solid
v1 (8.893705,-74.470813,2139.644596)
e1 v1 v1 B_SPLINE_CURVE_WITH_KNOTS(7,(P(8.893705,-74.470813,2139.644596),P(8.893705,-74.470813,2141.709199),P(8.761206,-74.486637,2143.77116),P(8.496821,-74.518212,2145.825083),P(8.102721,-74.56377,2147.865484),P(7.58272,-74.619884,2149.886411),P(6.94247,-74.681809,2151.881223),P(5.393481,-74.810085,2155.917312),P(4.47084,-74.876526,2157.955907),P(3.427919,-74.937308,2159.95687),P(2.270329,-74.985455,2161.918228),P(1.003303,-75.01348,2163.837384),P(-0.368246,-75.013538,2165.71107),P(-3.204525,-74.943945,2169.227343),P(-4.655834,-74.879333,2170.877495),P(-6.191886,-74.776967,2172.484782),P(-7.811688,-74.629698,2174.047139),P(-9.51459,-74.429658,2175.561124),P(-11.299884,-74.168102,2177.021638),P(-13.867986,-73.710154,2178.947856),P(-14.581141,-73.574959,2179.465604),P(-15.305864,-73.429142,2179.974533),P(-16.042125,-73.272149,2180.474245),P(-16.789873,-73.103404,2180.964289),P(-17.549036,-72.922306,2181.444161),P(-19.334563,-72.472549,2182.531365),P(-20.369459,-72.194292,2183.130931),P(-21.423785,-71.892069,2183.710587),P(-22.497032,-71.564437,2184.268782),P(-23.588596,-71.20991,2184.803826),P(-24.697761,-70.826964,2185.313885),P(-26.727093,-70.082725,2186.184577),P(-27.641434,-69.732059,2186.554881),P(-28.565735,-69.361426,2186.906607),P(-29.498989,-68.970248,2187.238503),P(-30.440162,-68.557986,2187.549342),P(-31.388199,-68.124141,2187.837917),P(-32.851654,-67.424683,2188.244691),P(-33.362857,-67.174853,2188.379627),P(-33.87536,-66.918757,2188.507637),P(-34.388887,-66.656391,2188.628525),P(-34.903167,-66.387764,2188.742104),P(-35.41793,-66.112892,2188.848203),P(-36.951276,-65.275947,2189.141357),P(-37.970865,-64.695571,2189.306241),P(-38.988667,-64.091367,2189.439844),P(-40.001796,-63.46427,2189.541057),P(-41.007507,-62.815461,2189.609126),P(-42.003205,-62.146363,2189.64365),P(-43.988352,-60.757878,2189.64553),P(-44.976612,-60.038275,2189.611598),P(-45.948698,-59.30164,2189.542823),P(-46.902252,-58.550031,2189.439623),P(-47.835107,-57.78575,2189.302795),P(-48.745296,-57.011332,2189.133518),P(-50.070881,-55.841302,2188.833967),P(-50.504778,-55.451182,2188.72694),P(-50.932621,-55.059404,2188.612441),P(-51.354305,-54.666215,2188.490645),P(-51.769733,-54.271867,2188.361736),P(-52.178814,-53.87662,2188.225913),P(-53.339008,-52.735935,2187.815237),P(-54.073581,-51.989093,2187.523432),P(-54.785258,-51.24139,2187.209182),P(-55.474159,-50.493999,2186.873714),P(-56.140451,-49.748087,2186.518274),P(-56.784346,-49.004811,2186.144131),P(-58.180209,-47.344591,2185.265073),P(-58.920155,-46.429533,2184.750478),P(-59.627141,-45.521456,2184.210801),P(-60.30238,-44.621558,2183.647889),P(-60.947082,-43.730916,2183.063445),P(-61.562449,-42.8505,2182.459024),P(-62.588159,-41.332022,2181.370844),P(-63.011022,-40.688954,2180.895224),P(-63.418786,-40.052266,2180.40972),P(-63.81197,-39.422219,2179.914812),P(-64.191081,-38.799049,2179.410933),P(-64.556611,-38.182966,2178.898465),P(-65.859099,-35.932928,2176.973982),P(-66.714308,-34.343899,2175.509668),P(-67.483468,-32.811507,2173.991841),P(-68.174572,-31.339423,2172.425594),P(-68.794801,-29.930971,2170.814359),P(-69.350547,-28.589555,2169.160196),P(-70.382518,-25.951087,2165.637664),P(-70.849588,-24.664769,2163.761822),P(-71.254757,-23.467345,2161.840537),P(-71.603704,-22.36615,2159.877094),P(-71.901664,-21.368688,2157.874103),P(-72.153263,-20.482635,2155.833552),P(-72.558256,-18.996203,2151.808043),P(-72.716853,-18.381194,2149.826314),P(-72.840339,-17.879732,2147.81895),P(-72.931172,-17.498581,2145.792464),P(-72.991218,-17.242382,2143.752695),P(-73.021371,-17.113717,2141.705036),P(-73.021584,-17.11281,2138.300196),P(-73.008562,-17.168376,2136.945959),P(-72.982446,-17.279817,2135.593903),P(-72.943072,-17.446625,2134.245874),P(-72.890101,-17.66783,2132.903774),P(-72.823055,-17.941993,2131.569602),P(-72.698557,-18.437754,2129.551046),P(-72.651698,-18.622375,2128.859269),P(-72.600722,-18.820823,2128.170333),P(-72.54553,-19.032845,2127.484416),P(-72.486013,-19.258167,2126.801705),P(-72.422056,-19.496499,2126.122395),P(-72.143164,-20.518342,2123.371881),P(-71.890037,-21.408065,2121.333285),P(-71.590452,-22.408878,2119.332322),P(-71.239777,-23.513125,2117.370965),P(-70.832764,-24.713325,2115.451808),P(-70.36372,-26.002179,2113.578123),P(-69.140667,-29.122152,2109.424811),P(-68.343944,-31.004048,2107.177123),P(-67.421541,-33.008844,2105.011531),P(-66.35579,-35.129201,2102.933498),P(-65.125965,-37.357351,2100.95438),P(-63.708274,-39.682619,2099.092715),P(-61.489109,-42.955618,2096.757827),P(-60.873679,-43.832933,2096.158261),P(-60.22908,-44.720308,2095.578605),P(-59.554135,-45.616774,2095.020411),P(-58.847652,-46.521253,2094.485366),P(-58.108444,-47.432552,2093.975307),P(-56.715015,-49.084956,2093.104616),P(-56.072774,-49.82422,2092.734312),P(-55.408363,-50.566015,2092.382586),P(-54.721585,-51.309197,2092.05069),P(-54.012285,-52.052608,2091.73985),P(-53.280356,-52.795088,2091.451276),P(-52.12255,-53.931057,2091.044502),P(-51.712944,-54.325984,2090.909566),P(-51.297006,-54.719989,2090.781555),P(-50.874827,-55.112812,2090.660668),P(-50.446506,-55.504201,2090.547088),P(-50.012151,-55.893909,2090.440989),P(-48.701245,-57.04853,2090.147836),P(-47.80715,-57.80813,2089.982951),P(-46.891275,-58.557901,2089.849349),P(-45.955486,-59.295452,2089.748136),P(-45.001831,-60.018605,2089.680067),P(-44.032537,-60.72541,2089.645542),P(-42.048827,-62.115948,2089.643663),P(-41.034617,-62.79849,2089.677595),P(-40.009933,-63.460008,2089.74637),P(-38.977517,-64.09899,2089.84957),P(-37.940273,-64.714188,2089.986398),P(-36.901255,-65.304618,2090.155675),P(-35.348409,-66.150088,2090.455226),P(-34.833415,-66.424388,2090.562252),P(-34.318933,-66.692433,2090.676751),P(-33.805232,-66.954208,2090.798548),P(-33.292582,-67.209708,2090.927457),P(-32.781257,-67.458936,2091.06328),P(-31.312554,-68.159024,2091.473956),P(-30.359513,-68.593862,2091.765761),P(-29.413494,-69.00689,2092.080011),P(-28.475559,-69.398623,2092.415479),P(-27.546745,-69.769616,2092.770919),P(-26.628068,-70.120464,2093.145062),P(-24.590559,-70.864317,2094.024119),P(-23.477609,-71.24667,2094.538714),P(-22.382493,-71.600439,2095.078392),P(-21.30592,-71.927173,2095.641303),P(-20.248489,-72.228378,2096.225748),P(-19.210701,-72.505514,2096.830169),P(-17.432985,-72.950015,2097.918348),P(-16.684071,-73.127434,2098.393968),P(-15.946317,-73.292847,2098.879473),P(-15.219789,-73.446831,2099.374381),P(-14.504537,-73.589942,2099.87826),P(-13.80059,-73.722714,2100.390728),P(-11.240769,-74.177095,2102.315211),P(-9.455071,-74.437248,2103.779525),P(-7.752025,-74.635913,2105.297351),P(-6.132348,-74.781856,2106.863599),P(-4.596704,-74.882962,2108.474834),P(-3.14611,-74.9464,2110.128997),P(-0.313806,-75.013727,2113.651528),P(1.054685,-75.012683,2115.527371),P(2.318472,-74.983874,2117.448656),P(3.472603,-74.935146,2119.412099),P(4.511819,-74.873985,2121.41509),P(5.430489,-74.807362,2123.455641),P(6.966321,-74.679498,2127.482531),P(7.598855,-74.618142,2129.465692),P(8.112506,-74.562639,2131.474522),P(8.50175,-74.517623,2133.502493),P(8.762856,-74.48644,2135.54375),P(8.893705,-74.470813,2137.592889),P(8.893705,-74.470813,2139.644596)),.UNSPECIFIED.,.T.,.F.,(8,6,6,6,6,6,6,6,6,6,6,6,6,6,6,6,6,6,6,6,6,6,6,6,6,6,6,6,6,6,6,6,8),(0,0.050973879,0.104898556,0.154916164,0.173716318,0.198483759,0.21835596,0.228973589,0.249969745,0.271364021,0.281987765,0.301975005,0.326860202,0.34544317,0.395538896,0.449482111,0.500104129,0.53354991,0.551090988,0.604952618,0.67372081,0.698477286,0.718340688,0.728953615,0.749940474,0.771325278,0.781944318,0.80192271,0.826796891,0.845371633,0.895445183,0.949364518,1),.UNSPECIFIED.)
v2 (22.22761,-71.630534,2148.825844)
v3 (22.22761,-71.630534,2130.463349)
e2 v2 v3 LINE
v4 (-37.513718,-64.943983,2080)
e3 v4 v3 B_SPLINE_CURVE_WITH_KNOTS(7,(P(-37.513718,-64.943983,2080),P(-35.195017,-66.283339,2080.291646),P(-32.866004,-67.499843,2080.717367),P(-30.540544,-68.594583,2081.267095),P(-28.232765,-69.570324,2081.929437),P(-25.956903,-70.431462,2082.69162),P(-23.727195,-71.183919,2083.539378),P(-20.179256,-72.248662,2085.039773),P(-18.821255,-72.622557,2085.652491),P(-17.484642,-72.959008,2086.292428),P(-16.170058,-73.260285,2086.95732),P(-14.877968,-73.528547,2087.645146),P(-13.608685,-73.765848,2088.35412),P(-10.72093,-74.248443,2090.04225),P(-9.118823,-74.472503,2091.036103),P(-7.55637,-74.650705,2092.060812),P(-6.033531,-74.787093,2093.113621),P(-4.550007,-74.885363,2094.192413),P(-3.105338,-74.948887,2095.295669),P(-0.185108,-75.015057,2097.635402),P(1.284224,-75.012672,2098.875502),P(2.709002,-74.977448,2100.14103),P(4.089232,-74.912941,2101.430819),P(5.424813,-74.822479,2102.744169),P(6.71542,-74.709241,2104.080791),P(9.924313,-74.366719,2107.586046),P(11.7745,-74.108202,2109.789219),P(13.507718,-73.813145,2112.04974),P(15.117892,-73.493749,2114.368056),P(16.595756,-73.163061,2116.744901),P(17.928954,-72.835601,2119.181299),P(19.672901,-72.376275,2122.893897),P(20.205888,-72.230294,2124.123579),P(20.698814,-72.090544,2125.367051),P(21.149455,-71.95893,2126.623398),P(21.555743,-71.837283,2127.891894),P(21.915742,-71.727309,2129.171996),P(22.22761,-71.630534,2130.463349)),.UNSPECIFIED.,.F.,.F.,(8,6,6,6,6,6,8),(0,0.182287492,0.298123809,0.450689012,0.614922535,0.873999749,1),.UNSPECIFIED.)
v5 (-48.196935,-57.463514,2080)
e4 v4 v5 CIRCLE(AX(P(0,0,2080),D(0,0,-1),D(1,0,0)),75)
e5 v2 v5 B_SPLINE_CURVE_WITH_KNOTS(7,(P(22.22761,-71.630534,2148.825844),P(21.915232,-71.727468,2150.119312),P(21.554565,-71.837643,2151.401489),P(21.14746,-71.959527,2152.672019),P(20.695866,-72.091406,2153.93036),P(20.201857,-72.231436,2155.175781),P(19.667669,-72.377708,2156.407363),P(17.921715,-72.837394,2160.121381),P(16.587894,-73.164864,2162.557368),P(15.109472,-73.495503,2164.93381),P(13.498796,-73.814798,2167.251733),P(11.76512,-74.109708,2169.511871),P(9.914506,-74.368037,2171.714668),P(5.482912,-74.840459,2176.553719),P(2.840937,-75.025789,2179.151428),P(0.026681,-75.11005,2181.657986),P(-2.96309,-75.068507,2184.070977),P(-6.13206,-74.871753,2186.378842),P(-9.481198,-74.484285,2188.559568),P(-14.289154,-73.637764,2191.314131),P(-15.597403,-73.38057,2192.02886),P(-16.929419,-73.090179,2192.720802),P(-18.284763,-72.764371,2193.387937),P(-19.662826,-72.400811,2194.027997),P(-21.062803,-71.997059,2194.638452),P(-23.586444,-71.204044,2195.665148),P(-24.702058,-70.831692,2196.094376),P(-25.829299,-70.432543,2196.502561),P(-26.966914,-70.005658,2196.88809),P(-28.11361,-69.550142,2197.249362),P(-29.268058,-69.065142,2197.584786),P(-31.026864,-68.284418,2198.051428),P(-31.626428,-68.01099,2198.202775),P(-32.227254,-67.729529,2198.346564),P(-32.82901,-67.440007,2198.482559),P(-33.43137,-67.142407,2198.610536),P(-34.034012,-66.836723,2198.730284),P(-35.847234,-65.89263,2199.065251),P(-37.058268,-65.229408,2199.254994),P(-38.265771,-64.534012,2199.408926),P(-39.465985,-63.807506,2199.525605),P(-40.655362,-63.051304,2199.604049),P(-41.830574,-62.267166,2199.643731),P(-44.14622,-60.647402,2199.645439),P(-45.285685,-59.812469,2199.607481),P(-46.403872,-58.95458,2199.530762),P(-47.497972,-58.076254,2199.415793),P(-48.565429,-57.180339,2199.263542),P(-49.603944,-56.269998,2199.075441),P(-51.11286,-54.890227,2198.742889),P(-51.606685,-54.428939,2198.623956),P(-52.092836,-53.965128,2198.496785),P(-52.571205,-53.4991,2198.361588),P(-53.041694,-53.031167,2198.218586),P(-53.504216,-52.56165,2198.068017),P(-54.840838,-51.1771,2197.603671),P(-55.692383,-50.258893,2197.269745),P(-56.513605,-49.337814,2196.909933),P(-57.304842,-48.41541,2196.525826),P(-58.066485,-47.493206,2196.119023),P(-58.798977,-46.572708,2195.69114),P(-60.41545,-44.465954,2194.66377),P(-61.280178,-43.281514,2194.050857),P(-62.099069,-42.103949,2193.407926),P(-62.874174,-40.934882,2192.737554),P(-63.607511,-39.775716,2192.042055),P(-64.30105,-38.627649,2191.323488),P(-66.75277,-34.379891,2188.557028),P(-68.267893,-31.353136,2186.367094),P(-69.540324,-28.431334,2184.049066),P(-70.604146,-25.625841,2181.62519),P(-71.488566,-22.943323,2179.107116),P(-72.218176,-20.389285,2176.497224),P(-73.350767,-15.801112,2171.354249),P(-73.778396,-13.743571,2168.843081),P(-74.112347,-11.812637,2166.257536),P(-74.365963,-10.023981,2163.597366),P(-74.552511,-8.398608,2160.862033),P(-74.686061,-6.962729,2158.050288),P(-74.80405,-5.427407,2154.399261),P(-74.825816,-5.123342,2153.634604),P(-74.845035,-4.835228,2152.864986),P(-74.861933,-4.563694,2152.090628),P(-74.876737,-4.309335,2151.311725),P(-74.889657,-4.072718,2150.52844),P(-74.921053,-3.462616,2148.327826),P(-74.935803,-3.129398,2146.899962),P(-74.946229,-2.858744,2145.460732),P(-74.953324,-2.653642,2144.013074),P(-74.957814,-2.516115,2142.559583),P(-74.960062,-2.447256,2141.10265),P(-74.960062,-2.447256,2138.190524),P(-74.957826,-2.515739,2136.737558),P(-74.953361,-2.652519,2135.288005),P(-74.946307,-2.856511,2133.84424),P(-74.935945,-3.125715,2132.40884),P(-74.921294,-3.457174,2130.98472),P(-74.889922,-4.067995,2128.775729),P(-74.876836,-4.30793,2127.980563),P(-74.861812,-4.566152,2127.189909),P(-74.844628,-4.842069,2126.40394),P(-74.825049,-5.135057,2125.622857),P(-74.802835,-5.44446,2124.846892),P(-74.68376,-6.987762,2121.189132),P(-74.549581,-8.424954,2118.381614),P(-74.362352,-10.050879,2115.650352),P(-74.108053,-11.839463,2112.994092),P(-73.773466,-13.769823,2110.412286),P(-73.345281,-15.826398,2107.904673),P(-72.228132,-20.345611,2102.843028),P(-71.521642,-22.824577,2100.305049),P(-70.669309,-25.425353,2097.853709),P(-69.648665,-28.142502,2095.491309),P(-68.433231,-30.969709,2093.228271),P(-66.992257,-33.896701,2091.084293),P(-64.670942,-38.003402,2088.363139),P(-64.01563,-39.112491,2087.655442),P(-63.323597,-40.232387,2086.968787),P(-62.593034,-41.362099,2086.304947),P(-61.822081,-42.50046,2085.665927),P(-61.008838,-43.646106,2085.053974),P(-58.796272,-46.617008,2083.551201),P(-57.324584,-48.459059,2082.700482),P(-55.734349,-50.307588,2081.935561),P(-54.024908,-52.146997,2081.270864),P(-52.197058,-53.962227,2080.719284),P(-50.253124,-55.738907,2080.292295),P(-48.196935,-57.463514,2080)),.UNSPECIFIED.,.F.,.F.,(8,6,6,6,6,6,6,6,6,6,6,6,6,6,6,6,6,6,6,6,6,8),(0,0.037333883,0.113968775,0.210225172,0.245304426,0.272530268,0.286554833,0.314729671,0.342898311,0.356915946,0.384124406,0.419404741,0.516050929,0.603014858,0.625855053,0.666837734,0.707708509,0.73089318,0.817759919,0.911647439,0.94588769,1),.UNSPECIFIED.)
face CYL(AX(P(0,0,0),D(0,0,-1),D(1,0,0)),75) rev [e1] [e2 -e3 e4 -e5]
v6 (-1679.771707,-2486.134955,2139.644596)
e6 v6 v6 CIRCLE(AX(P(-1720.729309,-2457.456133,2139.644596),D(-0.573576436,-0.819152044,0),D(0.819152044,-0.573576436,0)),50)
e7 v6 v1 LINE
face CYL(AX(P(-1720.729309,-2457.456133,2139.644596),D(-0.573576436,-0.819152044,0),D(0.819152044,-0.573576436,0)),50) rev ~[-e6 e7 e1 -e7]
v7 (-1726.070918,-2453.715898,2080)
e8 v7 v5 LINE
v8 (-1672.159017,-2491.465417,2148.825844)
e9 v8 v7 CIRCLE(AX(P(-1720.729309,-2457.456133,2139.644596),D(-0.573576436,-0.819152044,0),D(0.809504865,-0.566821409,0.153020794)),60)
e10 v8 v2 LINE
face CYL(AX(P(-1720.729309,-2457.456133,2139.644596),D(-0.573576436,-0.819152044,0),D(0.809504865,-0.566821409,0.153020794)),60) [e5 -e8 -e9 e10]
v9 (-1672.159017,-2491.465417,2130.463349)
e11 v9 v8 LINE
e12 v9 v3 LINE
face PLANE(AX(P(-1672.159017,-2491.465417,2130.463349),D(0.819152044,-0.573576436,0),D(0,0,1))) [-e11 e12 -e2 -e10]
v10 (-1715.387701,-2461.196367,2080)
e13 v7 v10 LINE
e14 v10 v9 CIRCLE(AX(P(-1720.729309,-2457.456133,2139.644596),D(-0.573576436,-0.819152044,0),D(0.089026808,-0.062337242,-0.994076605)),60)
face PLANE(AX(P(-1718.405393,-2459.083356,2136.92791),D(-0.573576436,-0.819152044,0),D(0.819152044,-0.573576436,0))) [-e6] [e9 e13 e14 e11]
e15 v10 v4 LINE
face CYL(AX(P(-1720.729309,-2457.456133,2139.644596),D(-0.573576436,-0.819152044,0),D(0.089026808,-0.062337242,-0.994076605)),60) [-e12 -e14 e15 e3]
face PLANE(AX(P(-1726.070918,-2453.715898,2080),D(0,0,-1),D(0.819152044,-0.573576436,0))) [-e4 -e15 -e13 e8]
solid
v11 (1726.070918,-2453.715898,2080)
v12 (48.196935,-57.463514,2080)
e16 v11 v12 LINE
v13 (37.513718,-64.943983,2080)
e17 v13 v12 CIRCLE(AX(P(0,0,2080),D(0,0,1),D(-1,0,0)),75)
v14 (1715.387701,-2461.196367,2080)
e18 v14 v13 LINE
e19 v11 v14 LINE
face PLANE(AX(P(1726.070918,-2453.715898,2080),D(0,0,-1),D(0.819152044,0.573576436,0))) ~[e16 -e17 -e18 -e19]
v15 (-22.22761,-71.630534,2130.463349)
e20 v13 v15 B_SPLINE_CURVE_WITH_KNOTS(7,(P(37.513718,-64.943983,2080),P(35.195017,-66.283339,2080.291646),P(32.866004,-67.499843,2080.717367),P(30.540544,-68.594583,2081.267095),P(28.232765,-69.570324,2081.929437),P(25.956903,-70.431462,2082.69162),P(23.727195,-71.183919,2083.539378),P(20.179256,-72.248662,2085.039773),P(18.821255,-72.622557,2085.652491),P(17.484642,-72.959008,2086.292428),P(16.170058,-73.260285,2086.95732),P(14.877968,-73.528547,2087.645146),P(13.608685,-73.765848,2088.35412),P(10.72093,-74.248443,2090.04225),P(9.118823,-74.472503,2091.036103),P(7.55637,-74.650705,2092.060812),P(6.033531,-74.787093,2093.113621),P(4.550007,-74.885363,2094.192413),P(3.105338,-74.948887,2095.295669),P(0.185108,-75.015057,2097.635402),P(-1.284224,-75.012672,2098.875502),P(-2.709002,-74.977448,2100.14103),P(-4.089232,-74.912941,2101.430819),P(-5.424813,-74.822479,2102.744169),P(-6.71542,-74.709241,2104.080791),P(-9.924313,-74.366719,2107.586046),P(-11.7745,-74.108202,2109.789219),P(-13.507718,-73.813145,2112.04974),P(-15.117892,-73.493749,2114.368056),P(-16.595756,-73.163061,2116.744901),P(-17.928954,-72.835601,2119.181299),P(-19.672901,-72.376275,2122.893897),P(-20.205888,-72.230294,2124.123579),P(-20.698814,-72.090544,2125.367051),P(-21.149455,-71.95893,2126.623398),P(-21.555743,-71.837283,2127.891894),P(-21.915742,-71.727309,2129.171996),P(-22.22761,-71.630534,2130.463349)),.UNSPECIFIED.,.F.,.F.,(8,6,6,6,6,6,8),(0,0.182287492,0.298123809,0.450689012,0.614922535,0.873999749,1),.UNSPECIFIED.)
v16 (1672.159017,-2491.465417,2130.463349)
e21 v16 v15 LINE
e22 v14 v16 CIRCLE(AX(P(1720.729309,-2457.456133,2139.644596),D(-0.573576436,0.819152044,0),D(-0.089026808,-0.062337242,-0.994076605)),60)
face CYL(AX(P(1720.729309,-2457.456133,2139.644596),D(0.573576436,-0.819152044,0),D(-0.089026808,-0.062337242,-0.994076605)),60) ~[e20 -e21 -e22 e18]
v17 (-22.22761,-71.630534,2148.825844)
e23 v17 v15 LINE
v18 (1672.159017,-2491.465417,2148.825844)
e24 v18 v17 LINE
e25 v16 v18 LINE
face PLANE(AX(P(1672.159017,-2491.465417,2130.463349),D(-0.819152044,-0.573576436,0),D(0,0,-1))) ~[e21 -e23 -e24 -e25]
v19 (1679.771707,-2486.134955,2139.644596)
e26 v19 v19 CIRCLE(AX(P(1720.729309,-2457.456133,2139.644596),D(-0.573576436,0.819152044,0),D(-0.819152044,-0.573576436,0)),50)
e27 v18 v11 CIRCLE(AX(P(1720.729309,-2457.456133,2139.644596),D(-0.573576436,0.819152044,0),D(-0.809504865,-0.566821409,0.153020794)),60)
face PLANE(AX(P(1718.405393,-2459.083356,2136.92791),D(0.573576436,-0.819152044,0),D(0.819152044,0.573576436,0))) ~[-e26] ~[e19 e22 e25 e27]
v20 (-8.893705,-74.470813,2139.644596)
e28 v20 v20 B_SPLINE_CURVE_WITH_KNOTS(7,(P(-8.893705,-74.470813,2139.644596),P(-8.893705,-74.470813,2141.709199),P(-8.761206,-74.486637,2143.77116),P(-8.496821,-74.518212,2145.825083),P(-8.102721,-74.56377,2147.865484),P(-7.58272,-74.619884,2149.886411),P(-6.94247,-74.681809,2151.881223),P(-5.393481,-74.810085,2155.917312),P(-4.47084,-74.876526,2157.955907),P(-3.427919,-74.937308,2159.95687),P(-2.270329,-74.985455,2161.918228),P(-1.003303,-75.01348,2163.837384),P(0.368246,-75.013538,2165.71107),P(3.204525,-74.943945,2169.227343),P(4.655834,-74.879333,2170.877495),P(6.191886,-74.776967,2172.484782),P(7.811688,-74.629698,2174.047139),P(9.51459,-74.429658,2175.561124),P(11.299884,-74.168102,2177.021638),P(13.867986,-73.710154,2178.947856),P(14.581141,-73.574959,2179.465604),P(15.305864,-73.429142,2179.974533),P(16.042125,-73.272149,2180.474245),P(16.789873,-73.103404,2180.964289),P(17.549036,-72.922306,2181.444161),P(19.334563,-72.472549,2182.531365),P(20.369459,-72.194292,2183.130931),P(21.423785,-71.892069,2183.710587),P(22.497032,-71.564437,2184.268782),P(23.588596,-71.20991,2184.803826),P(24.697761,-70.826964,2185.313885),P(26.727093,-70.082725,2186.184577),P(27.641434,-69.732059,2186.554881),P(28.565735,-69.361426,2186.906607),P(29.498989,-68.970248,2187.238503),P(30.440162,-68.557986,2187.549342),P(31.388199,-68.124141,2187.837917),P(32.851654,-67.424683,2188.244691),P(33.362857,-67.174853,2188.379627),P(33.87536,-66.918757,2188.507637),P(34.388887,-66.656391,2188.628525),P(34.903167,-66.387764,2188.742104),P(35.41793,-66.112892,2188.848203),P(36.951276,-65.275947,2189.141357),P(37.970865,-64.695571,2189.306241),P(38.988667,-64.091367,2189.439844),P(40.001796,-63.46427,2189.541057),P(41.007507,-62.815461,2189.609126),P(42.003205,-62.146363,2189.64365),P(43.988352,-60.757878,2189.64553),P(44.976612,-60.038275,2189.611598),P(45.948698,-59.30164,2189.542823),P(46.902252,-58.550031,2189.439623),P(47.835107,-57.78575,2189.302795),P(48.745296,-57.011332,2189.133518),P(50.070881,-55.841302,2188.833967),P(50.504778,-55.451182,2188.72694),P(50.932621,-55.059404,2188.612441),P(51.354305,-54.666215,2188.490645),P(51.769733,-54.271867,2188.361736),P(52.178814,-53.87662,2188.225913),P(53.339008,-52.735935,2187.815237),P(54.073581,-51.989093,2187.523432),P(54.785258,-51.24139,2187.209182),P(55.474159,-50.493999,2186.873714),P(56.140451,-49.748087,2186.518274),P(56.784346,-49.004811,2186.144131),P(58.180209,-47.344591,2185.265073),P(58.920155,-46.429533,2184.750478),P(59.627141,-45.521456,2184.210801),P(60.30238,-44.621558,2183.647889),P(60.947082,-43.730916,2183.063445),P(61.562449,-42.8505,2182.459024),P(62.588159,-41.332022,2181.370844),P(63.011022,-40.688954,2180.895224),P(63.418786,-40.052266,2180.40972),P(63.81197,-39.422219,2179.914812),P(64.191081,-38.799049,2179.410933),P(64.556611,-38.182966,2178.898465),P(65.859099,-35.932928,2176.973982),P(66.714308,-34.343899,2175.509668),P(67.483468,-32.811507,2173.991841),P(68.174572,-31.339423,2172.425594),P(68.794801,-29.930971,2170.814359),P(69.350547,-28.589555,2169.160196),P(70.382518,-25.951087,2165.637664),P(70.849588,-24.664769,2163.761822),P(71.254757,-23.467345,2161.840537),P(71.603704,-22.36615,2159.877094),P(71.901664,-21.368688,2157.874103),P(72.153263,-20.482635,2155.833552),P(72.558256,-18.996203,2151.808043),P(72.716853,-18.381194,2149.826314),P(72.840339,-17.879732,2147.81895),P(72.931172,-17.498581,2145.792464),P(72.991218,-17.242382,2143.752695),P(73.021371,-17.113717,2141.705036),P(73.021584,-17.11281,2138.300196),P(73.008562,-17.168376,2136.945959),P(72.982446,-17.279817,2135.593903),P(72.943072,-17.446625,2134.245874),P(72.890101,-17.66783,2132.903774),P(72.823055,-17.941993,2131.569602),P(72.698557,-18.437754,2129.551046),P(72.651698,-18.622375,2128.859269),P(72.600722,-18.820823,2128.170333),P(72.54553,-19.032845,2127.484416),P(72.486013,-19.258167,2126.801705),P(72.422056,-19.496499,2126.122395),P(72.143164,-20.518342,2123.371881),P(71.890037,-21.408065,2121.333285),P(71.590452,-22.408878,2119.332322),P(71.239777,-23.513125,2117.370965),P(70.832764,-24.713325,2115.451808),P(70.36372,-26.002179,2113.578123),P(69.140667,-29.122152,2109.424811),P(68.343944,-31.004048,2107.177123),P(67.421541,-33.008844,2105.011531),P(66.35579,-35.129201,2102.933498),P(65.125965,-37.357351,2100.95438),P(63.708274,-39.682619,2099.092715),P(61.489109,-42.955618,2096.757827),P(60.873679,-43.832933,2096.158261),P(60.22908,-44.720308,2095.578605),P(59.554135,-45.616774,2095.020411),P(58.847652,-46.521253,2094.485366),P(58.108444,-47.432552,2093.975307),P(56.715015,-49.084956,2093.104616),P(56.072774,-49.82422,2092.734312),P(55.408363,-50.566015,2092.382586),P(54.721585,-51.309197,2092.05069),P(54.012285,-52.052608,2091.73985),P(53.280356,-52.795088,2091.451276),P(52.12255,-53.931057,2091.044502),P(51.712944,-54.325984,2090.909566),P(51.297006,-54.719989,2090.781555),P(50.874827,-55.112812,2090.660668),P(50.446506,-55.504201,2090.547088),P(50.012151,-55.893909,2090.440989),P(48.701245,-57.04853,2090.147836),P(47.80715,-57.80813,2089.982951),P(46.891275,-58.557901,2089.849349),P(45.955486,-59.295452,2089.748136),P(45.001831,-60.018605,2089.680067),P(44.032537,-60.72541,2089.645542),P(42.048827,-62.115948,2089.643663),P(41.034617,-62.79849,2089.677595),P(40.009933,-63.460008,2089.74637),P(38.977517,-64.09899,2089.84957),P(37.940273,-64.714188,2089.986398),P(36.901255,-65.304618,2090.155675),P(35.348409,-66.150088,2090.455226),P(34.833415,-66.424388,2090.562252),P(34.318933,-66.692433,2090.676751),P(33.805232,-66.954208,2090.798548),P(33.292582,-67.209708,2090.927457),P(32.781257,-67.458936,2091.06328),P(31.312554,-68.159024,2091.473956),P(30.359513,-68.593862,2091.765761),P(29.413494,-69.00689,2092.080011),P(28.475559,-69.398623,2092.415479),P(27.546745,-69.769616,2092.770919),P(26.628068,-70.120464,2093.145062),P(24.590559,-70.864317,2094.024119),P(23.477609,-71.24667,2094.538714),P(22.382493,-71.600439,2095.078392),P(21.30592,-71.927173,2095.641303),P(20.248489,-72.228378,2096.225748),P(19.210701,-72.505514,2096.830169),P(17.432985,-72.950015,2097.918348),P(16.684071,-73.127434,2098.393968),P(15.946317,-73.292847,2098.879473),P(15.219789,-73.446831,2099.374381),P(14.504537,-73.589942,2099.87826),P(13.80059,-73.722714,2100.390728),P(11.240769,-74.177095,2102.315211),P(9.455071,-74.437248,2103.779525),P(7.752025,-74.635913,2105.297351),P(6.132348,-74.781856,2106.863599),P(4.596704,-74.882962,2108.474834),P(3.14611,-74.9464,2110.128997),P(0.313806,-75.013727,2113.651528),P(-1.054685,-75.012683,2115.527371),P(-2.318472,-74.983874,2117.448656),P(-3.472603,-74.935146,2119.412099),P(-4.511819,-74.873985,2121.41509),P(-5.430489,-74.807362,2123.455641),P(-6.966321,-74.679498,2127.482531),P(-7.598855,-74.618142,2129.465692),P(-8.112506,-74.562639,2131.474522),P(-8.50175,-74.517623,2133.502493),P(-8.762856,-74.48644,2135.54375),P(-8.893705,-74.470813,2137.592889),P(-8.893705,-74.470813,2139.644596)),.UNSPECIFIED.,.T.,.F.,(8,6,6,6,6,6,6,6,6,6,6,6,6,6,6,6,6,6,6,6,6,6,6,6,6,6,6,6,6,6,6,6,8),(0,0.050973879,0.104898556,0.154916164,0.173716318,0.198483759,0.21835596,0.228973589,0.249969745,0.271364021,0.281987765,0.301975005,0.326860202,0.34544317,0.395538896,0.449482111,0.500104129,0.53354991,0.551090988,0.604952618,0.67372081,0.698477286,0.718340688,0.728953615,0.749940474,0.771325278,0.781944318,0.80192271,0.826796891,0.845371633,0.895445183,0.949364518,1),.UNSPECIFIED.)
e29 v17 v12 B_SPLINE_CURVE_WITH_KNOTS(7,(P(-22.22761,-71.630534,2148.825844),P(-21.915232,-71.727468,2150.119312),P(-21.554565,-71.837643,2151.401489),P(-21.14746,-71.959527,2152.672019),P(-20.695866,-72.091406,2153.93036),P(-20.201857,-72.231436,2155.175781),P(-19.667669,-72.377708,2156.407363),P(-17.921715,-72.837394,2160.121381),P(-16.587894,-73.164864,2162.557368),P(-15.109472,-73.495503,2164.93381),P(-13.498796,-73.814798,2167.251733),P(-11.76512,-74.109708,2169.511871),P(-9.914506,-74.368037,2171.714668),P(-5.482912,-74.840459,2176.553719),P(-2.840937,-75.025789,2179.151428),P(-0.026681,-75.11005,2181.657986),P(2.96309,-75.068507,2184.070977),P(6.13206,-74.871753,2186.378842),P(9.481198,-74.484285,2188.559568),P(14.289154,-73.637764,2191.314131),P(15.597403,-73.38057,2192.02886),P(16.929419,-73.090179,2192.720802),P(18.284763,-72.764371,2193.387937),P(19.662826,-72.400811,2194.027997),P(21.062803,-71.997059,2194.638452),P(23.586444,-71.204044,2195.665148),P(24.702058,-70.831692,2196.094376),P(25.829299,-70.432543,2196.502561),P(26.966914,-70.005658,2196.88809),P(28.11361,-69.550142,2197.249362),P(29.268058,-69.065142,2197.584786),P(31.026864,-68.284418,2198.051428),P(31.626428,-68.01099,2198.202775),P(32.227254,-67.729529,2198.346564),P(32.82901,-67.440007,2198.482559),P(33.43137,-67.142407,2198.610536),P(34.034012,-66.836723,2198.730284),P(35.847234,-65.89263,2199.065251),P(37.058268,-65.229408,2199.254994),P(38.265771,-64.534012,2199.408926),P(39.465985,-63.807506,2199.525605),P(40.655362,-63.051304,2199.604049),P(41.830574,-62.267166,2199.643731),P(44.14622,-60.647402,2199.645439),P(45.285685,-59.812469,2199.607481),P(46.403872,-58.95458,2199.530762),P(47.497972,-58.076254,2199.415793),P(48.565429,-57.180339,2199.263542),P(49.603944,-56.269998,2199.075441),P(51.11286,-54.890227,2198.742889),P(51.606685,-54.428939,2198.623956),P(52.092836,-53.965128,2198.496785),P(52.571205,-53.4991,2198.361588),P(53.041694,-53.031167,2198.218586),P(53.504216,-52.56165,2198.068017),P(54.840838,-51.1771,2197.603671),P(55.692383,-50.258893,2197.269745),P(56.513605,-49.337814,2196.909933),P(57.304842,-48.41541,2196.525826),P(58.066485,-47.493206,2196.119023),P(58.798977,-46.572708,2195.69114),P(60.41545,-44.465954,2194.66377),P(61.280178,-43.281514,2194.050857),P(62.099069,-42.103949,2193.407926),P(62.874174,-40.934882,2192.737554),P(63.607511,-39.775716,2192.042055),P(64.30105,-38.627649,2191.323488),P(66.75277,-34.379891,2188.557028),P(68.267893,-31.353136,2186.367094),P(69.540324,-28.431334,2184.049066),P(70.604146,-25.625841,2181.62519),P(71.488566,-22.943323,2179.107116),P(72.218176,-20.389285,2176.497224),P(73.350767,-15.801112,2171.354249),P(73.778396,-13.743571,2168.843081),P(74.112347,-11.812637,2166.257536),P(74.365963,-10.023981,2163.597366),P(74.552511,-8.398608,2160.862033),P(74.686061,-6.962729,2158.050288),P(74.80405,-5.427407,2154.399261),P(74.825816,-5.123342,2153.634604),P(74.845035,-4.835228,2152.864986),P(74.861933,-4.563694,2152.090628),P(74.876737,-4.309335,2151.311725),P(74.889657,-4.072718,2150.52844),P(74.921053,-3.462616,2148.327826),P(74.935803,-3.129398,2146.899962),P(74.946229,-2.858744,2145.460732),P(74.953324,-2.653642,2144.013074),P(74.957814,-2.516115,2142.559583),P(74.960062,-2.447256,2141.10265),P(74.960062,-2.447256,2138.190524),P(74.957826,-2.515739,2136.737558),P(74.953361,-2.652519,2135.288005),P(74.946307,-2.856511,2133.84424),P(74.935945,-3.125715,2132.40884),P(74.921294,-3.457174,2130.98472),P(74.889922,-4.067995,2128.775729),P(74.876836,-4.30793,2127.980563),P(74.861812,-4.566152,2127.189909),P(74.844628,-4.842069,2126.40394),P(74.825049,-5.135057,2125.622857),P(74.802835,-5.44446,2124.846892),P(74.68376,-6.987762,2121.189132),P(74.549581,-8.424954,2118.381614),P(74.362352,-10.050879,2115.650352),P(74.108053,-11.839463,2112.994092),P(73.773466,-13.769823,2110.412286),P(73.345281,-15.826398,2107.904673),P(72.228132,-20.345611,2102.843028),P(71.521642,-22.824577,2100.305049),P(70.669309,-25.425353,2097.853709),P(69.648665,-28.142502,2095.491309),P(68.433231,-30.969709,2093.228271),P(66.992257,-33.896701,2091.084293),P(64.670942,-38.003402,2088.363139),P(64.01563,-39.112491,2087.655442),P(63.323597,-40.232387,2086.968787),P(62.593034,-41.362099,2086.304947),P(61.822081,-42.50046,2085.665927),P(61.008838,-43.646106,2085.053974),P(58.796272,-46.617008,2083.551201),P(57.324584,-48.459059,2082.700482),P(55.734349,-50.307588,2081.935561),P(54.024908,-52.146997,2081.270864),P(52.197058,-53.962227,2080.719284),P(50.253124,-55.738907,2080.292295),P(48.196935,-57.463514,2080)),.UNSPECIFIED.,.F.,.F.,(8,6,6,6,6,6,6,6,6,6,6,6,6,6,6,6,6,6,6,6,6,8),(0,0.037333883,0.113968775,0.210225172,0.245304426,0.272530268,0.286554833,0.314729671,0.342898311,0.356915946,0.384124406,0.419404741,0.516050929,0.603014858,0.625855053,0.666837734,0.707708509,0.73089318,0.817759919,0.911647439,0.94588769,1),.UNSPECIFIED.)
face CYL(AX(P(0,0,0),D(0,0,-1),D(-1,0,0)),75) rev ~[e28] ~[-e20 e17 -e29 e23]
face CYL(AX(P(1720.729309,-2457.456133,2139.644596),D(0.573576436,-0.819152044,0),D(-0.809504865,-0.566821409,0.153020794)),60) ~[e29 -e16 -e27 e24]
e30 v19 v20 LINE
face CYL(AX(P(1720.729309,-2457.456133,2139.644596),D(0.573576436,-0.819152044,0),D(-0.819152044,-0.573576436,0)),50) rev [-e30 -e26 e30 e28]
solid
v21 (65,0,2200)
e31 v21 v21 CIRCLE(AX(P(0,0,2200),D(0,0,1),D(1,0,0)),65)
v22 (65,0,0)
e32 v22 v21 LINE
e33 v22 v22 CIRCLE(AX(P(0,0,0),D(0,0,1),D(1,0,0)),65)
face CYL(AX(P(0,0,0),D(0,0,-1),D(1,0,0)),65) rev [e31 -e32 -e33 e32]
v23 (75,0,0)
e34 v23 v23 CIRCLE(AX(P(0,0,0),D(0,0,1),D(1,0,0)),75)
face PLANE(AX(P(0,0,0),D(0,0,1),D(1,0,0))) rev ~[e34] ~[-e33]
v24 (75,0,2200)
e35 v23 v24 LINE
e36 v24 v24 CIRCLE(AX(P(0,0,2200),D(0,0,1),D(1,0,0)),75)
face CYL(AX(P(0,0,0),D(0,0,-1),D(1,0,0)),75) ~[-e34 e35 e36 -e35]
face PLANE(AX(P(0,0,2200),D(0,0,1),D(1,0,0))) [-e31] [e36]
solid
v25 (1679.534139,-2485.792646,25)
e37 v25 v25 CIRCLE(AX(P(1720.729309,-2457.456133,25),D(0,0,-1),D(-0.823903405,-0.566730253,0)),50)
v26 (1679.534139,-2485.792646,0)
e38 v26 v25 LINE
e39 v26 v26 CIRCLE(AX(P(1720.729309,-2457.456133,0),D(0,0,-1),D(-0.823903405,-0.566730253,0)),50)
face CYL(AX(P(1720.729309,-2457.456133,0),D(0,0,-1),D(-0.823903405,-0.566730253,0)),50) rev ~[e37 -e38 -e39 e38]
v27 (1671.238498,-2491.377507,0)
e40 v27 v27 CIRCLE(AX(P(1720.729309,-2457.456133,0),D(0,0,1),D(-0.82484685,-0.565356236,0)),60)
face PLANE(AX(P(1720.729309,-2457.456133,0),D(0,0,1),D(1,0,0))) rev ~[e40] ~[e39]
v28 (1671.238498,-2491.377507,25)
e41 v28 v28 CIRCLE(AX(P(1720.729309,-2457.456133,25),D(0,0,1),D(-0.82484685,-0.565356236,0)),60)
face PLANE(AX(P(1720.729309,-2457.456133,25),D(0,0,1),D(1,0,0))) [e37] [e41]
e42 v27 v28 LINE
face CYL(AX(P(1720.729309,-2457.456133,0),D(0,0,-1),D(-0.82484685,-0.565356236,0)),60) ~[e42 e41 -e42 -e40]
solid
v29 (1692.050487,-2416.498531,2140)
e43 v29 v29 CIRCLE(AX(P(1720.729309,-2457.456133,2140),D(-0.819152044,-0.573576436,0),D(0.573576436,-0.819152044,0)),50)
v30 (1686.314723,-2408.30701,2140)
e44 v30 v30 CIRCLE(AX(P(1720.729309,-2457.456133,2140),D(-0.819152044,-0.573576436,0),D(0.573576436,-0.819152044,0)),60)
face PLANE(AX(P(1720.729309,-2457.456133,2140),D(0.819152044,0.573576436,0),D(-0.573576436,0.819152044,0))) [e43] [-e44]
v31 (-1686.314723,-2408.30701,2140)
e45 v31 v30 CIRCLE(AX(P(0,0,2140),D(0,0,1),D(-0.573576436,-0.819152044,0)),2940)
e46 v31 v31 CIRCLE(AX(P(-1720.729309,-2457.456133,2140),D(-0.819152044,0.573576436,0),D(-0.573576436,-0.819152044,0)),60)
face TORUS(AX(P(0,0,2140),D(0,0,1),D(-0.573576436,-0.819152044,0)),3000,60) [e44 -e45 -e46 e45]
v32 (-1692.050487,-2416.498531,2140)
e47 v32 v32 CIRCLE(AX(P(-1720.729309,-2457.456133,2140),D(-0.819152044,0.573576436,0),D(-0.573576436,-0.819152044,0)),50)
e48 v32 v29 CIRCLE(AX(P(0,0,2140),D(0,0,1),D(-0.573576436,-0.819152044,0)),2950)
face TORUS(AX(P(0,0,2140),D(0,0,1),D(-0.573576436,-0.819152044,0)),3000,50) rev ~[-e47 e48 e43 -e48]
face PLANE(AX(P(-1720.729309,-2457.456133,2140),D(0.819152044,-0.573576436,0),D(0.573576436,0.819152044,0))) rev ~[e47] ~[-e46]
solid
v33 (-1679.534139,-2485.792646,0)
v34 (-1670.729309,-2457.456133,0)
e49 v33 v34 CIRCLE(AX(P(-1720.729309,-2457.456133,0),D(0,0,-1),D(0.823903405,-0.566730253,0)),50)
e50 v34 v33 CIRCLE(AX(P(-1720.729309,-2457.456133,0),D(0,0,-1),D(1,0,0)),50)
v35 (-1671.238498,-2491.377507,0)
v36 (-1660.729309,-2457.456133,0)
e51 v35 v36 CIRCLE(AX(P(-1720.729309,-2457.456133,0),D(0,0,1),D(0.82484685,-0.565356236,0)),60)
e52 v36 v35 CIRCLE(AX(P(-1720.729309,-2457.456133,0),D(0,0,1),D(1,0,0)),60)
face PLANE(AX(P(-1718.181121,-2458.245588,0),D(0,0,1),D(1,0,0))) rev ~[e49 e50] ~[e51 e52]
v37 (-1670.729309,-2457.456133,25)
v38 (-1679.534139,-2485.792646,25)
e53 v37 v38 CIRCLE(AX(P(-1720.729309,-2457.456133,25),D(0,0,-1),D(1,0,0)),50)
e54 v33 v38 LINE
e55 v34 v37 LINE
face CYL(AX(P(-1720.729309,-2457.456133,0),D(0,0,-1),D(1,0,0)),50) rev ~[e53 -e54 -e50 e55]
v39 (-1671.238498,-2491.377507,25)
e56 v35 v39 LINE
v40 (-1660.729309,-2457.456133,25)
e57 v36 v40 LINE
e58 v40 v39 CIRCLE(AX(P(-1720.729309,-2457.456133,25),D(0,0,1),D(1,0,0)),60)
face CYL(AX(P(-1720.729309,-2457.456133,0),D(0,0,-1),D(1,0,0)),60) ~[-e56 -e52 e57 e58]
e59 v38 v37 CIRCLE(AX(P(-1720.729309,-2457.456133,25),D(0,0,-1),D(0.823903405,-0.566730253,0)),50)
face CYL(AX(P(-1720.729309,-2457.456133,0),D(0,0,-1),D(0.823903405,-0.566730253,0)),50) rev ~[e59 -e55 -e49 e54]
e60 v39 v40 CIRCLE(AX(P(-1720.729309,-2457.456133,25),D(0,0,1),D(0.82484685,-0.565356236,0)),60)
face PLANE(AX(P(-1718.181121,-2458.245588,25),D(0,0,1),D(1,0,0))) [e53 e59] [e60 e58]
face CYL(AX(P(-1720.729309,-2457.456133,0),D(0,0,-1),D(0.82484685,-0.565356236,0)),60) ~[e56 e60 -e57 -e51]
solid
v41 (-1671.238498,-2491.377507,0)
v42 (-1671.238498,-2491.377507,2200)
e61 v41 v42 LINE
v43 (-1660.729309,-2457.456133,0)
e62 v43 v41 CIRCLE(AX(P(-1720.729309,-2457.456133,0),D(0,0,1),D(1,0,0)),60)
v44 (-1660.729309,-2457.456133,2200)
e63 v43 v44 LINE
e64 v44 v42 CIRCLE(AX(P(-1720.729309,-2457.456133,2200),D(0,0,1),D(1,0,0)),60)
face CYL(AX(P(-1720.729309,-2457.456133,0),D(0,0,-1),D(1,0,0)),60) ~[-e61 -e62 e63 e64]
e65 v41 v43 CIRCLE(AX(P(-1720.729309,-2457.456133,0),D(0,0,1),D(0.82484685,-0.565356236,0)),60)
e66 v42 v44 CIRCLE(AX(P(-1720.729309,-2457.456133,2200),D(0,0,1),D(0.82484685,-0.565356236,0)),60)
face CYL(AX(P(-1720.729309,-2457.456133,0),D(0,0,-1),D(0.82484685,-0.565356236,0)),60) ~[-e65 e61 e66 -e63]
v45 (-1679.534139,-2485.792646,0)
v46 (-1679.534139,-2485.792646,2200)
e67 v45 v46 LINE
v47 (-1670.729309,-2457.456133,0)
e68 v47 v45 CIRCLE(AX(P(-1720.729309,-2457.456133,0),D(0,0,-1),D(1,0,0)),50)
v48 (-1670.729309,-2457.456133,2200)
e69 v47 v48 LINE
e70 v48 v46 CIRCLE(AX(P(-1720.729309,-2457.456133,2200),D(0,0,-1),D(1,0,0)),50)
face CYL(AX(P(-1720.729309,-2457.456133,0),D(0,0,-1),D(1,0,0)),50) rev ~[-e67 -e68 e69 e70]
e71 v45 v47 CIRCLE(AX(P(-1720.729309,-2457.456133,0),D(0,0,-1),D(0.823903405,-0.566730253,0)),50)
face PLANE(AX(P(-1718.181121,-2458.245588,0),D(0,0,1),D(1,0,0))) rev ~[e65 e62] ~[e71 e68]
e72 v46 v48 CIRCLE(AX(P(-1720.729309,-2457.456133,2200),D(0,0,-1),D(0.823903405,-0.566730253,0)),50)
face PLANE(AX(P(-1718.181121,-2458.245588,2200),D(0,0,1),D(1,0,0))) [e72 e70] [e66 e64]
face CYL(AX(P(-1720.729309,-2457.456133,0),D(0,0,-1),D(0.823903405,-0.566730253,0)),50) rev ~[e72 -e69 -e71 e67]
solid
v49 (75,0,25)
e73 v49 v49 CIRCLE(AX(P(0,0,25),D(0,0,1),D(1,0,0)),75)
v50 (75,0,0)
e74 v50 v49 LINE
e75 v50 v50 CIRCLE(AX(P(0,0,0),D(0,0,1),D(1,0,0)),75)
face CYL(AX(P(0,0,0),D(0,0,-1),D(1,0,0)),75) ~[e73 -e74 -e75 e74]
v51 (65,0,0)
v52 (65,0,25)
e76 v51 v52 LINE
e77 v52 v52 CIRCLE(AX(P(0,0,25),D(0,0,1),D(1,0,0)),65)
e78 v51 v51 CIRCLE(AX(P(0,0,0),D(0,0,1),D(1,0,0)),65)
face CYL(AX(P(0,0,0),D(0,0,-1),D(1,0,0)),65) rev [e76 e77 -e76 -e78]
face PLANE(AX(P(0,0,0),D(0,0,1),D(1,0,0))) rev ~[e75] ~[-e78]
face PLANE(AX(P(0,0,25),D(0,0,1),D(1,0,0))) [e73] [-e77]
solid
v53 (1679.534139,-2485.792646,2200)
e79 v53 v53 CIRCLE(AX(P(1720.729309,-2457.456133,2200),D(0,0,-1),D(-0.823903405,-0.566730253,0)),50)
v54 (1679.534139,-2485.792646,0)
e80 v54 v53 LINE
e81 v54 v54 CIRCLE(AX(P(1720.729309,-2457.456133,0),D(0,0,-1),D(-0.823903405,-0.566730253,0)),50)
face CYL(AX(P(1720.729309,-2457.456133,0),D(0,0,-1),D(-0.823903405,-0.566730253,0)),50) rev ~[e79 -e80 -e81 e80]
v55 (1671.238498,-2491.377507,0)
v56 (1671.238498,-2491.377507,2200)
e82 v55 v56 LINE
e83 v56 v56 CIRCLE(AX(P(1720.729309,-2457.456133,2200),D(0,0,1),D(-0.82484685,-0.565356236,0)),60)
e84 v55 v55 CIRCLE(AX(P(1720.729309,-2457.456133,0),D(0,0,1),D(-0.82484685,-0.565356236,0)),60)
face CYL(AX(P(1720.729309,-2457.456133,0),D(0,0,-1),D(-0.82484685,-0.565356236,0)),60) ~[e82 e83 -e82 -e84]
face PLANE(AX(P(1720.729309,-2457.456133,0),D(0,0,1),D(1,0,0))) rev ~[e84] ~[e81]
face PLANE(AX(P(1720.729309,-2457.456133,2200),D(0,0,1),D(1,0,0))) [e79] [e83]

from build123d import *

# Parameters (mm, degrees)
F0_W     = 220
F0_H     = 220
F1_DEPTH = 3
F3_R     = 75
F3_R_2   = 65
F4_DEPTH = 2200
F5_DEPTH = 25
F8_R     = 50
F9_REACH = 4251.7766190325
F12_R    = 60
F12_R_2  = 50


with BuildPart() as f1:
    # F0 (on Front) → F1 (new body)
    with BuildSketch(Plane.XZ):
        Rectangle(F0_W, F0_H)
    extrude(amount=F1_DEPTH)


with BuildPart() as f4:
    # F3 (on Top) → F4 (new body)
    with BuildSketch(Plane.XY):
        Circle(F3_R)
        Circle(F3_R_2, mode=Mode.SUBTRACT)
    extrude(amount=F4_DEPTH)


with BuildPart() as f4b:
    # F3 (on Top) → F4, piece 2 (new body)
    with BuildSketch(Plane.XY):
        with BuildLine():
            ThreePointArc((-1660.7293090531, -2457.456132867), (-1778.0418236555, -2439.7001290949), (-1671.2384980516, -2491.3775070491))
            ThreePointArc((-1671.2384980516, -2491.3775070491), (-1663.4167944508, -2475.212136639), (-1660.7293090531, -2457.456132867))
        make_face()
        with BuildLine():
            ThreePointArc((-1670.7293090531, -2457.456132867), (-1672.981227879, -2472.2925995685), (-1679.5341388205, -2485.792645523))
            ThreePointArc((-1679.5341388205, -2485.792645523), (-1768.4773902273, -2442.6196661655), (-1670.7293090531, -2457.456132867))
        make_face(mode=Mode.SUBTRACT)
    extrude(amount=F4_DEPTH)


with BuildPart() as f4c:
    # F3 (on Top) → F4, piece 3 (new body)
    with BuildSketch(Plane.XY):
        with BuildLine():
            ThreePointArc((1780.7293090531, -2457.456132867), (1702.9733052811, -2400.1436182646), (1671.2384980516, -2491.3775070491))
            ThreePointArc((1671.2384980516, -2491.3775070491), (1738.4853128252, -2514.7686474693), (1780.7293090531, -2457.456132867))
        make_face()
        with BuildLine():
            ThreePointArc((1770.7293090531, -2457.456132867), (1735.5657757546, -2505.2042140411), (1679.5341388205, -2485.792645523))
            ThreePointArc((1679.5341388205, -2485.792645523), (1705.8928423516, -2409.7080516928), (1770.7293090531, -2457.456132867))
        make_face(mode=Mode.SUBTRACT)
    extrude(amount=F4_DEPTH)


with BuildPart() as f5:
    # F3 (on Top) → F5 (new body)
    with BuildSketch(Plane.XY):
        Circle(F3_R)
        Circle(F3_R_2, mode=Mode.SUBTRACT)
    extrude(amount=F5_DEPTH)


with BuildPart() as f5b:
    # F3 (on Top) → F5, piece 2 (new body)
    with BuildSketch(Plane.XY):
        with BuildLine():
            ThreePointArc((-1660.7293090531, -2457.456132867), (-1778.0418236555, -2439.7001290949), (-1671.2384980516, -2491.3775070491))
            ThreePointArc((-1671.2384980516, -2491.3775070491), (-1663.4167944508, -2475.212136639), (-1660.7293090531, -2457.456132867))
        make_face()
        with BuildLine():
            ThreePointArc((-1670.7293090531, -2457.456132867), (-1672.981227879, -2472.2925995685), (-1679.5341388205, -2485.792645523))
            ThreePointArc((-1679.5341388205, -2485.792645523), (-1768.4773902273, -2442.6196661655), (-1670.7293090531, -2457.456132867))
        make_face(mode=Mode.SUBTRACT)
    extrude(amount=F5_DEPTH)


with BuildPart() as f5c:
    # F3 (on Top) → F5, piece 3 (new body)
    with BuildSketch(Plane.XY):
        with BuildLine():
            ThreePointArc((1780.7293090531, -2457.456132867), (1702.9733052811, -2400.1436182646), (1671.2384980516, -2491.3775070491))
            ThreePointArc((1671.2384980516, -2491.3775070491), (1738.4853128252, -2514.7686474693), (1780.7293090531, -2457.456132867))
        make_face()
        with BuildLine():
            ThreePointArc((1770.7293090531, -2457.456132867), (1735.5657757546, -2505.2042140411), (1679.5341388205, -2485.792645523))
            ThreePointArc((1679.5341388205, -2485.792645523), (1705.8928423516, -2409.7080516928), (1770.7293090531, -2457.456132867))
        make_face(mode=Mode.SUBTRACT)
    extrude(amount=F5_DEPTH)


with BuildPart() as f9:
    f9_end = f4.part.faces().sort_by_distance((-75, 0, 1100))[0]
    # F8 (on line) → F9 (new body, up to a face of F4 that its end follows)
    with BuildSketch(Plane(origin=(-1720.7293090531, -2457.456132867, 0), x_dir=(0.8191520443, -0.5735764364, 0), z_dir=(-0.5735764364, -0.8191520443, 0))):
        with BuildLine():
            ThreePointArc((59.2933781445, 2148.8258439111), (-4.6041997855, 2199.4676799799), (-60, 2139.6445962719))
            ThreePointArc((-60, 2139.6445962719), (-44.6724411369, 2099.589971035), (-6.5208999043, 2080))
            Line((-6.5208999043, 2080), (6.5208999043, 2080))
            ThreePointArc((6.5208999043, 2080), (41.4670614775, 2096.2800622329), (59.2933781445, 2130.4633486327))
            Line((59.2933781445, 2130.4633486327), (59.2933781445, 2148.8258439111))
        make_face()
        with Locations((0, 2139.6445962719)):
            Circle(F8_R, mode=Mode.SUBTRACT)
    f9_long = extrude(amount=-F9_REACH, mode=Mode.PRIVATE)
    add(split(f9_long, bisect_by=f9_end, keep=Keep.ALL, mode=Mode.PRIVATE).solids().sort_by_distance((-1755.2511826319, -2433.283656754, 2179.9439809286))[0])


with BuildPart() as f10_1:
    # F10: instance of F9
    add(f9.part.mirror(Plane.YZ))


with BuildPart() as f13:
    # F13: sweep along a path in F11
    with BuildLine(Plane.XY.offset(2200)) as f13_path:
        ThreePointArc((-1720.7293090531, -2457.456132867), (0, -3000), (1720.7293090531, -2457.456132867))
    # F12 (on Right) → F13 (sweep)
    with BuildSketch(Plane.YZ):
        with Locations((-3000, 2140)):
            Circle(F12_R)
        with Locations((-3000, 2140)):
            Circle(F12_R_2, mode=Mode.SUBTRACT)
    sweep(path=f13_path.line)


solid = Compound([f4.part, f4b.part, f4c.part, f5.part, f5b.part, f5c.part, f9.part, f10_1.part, f13.part])
